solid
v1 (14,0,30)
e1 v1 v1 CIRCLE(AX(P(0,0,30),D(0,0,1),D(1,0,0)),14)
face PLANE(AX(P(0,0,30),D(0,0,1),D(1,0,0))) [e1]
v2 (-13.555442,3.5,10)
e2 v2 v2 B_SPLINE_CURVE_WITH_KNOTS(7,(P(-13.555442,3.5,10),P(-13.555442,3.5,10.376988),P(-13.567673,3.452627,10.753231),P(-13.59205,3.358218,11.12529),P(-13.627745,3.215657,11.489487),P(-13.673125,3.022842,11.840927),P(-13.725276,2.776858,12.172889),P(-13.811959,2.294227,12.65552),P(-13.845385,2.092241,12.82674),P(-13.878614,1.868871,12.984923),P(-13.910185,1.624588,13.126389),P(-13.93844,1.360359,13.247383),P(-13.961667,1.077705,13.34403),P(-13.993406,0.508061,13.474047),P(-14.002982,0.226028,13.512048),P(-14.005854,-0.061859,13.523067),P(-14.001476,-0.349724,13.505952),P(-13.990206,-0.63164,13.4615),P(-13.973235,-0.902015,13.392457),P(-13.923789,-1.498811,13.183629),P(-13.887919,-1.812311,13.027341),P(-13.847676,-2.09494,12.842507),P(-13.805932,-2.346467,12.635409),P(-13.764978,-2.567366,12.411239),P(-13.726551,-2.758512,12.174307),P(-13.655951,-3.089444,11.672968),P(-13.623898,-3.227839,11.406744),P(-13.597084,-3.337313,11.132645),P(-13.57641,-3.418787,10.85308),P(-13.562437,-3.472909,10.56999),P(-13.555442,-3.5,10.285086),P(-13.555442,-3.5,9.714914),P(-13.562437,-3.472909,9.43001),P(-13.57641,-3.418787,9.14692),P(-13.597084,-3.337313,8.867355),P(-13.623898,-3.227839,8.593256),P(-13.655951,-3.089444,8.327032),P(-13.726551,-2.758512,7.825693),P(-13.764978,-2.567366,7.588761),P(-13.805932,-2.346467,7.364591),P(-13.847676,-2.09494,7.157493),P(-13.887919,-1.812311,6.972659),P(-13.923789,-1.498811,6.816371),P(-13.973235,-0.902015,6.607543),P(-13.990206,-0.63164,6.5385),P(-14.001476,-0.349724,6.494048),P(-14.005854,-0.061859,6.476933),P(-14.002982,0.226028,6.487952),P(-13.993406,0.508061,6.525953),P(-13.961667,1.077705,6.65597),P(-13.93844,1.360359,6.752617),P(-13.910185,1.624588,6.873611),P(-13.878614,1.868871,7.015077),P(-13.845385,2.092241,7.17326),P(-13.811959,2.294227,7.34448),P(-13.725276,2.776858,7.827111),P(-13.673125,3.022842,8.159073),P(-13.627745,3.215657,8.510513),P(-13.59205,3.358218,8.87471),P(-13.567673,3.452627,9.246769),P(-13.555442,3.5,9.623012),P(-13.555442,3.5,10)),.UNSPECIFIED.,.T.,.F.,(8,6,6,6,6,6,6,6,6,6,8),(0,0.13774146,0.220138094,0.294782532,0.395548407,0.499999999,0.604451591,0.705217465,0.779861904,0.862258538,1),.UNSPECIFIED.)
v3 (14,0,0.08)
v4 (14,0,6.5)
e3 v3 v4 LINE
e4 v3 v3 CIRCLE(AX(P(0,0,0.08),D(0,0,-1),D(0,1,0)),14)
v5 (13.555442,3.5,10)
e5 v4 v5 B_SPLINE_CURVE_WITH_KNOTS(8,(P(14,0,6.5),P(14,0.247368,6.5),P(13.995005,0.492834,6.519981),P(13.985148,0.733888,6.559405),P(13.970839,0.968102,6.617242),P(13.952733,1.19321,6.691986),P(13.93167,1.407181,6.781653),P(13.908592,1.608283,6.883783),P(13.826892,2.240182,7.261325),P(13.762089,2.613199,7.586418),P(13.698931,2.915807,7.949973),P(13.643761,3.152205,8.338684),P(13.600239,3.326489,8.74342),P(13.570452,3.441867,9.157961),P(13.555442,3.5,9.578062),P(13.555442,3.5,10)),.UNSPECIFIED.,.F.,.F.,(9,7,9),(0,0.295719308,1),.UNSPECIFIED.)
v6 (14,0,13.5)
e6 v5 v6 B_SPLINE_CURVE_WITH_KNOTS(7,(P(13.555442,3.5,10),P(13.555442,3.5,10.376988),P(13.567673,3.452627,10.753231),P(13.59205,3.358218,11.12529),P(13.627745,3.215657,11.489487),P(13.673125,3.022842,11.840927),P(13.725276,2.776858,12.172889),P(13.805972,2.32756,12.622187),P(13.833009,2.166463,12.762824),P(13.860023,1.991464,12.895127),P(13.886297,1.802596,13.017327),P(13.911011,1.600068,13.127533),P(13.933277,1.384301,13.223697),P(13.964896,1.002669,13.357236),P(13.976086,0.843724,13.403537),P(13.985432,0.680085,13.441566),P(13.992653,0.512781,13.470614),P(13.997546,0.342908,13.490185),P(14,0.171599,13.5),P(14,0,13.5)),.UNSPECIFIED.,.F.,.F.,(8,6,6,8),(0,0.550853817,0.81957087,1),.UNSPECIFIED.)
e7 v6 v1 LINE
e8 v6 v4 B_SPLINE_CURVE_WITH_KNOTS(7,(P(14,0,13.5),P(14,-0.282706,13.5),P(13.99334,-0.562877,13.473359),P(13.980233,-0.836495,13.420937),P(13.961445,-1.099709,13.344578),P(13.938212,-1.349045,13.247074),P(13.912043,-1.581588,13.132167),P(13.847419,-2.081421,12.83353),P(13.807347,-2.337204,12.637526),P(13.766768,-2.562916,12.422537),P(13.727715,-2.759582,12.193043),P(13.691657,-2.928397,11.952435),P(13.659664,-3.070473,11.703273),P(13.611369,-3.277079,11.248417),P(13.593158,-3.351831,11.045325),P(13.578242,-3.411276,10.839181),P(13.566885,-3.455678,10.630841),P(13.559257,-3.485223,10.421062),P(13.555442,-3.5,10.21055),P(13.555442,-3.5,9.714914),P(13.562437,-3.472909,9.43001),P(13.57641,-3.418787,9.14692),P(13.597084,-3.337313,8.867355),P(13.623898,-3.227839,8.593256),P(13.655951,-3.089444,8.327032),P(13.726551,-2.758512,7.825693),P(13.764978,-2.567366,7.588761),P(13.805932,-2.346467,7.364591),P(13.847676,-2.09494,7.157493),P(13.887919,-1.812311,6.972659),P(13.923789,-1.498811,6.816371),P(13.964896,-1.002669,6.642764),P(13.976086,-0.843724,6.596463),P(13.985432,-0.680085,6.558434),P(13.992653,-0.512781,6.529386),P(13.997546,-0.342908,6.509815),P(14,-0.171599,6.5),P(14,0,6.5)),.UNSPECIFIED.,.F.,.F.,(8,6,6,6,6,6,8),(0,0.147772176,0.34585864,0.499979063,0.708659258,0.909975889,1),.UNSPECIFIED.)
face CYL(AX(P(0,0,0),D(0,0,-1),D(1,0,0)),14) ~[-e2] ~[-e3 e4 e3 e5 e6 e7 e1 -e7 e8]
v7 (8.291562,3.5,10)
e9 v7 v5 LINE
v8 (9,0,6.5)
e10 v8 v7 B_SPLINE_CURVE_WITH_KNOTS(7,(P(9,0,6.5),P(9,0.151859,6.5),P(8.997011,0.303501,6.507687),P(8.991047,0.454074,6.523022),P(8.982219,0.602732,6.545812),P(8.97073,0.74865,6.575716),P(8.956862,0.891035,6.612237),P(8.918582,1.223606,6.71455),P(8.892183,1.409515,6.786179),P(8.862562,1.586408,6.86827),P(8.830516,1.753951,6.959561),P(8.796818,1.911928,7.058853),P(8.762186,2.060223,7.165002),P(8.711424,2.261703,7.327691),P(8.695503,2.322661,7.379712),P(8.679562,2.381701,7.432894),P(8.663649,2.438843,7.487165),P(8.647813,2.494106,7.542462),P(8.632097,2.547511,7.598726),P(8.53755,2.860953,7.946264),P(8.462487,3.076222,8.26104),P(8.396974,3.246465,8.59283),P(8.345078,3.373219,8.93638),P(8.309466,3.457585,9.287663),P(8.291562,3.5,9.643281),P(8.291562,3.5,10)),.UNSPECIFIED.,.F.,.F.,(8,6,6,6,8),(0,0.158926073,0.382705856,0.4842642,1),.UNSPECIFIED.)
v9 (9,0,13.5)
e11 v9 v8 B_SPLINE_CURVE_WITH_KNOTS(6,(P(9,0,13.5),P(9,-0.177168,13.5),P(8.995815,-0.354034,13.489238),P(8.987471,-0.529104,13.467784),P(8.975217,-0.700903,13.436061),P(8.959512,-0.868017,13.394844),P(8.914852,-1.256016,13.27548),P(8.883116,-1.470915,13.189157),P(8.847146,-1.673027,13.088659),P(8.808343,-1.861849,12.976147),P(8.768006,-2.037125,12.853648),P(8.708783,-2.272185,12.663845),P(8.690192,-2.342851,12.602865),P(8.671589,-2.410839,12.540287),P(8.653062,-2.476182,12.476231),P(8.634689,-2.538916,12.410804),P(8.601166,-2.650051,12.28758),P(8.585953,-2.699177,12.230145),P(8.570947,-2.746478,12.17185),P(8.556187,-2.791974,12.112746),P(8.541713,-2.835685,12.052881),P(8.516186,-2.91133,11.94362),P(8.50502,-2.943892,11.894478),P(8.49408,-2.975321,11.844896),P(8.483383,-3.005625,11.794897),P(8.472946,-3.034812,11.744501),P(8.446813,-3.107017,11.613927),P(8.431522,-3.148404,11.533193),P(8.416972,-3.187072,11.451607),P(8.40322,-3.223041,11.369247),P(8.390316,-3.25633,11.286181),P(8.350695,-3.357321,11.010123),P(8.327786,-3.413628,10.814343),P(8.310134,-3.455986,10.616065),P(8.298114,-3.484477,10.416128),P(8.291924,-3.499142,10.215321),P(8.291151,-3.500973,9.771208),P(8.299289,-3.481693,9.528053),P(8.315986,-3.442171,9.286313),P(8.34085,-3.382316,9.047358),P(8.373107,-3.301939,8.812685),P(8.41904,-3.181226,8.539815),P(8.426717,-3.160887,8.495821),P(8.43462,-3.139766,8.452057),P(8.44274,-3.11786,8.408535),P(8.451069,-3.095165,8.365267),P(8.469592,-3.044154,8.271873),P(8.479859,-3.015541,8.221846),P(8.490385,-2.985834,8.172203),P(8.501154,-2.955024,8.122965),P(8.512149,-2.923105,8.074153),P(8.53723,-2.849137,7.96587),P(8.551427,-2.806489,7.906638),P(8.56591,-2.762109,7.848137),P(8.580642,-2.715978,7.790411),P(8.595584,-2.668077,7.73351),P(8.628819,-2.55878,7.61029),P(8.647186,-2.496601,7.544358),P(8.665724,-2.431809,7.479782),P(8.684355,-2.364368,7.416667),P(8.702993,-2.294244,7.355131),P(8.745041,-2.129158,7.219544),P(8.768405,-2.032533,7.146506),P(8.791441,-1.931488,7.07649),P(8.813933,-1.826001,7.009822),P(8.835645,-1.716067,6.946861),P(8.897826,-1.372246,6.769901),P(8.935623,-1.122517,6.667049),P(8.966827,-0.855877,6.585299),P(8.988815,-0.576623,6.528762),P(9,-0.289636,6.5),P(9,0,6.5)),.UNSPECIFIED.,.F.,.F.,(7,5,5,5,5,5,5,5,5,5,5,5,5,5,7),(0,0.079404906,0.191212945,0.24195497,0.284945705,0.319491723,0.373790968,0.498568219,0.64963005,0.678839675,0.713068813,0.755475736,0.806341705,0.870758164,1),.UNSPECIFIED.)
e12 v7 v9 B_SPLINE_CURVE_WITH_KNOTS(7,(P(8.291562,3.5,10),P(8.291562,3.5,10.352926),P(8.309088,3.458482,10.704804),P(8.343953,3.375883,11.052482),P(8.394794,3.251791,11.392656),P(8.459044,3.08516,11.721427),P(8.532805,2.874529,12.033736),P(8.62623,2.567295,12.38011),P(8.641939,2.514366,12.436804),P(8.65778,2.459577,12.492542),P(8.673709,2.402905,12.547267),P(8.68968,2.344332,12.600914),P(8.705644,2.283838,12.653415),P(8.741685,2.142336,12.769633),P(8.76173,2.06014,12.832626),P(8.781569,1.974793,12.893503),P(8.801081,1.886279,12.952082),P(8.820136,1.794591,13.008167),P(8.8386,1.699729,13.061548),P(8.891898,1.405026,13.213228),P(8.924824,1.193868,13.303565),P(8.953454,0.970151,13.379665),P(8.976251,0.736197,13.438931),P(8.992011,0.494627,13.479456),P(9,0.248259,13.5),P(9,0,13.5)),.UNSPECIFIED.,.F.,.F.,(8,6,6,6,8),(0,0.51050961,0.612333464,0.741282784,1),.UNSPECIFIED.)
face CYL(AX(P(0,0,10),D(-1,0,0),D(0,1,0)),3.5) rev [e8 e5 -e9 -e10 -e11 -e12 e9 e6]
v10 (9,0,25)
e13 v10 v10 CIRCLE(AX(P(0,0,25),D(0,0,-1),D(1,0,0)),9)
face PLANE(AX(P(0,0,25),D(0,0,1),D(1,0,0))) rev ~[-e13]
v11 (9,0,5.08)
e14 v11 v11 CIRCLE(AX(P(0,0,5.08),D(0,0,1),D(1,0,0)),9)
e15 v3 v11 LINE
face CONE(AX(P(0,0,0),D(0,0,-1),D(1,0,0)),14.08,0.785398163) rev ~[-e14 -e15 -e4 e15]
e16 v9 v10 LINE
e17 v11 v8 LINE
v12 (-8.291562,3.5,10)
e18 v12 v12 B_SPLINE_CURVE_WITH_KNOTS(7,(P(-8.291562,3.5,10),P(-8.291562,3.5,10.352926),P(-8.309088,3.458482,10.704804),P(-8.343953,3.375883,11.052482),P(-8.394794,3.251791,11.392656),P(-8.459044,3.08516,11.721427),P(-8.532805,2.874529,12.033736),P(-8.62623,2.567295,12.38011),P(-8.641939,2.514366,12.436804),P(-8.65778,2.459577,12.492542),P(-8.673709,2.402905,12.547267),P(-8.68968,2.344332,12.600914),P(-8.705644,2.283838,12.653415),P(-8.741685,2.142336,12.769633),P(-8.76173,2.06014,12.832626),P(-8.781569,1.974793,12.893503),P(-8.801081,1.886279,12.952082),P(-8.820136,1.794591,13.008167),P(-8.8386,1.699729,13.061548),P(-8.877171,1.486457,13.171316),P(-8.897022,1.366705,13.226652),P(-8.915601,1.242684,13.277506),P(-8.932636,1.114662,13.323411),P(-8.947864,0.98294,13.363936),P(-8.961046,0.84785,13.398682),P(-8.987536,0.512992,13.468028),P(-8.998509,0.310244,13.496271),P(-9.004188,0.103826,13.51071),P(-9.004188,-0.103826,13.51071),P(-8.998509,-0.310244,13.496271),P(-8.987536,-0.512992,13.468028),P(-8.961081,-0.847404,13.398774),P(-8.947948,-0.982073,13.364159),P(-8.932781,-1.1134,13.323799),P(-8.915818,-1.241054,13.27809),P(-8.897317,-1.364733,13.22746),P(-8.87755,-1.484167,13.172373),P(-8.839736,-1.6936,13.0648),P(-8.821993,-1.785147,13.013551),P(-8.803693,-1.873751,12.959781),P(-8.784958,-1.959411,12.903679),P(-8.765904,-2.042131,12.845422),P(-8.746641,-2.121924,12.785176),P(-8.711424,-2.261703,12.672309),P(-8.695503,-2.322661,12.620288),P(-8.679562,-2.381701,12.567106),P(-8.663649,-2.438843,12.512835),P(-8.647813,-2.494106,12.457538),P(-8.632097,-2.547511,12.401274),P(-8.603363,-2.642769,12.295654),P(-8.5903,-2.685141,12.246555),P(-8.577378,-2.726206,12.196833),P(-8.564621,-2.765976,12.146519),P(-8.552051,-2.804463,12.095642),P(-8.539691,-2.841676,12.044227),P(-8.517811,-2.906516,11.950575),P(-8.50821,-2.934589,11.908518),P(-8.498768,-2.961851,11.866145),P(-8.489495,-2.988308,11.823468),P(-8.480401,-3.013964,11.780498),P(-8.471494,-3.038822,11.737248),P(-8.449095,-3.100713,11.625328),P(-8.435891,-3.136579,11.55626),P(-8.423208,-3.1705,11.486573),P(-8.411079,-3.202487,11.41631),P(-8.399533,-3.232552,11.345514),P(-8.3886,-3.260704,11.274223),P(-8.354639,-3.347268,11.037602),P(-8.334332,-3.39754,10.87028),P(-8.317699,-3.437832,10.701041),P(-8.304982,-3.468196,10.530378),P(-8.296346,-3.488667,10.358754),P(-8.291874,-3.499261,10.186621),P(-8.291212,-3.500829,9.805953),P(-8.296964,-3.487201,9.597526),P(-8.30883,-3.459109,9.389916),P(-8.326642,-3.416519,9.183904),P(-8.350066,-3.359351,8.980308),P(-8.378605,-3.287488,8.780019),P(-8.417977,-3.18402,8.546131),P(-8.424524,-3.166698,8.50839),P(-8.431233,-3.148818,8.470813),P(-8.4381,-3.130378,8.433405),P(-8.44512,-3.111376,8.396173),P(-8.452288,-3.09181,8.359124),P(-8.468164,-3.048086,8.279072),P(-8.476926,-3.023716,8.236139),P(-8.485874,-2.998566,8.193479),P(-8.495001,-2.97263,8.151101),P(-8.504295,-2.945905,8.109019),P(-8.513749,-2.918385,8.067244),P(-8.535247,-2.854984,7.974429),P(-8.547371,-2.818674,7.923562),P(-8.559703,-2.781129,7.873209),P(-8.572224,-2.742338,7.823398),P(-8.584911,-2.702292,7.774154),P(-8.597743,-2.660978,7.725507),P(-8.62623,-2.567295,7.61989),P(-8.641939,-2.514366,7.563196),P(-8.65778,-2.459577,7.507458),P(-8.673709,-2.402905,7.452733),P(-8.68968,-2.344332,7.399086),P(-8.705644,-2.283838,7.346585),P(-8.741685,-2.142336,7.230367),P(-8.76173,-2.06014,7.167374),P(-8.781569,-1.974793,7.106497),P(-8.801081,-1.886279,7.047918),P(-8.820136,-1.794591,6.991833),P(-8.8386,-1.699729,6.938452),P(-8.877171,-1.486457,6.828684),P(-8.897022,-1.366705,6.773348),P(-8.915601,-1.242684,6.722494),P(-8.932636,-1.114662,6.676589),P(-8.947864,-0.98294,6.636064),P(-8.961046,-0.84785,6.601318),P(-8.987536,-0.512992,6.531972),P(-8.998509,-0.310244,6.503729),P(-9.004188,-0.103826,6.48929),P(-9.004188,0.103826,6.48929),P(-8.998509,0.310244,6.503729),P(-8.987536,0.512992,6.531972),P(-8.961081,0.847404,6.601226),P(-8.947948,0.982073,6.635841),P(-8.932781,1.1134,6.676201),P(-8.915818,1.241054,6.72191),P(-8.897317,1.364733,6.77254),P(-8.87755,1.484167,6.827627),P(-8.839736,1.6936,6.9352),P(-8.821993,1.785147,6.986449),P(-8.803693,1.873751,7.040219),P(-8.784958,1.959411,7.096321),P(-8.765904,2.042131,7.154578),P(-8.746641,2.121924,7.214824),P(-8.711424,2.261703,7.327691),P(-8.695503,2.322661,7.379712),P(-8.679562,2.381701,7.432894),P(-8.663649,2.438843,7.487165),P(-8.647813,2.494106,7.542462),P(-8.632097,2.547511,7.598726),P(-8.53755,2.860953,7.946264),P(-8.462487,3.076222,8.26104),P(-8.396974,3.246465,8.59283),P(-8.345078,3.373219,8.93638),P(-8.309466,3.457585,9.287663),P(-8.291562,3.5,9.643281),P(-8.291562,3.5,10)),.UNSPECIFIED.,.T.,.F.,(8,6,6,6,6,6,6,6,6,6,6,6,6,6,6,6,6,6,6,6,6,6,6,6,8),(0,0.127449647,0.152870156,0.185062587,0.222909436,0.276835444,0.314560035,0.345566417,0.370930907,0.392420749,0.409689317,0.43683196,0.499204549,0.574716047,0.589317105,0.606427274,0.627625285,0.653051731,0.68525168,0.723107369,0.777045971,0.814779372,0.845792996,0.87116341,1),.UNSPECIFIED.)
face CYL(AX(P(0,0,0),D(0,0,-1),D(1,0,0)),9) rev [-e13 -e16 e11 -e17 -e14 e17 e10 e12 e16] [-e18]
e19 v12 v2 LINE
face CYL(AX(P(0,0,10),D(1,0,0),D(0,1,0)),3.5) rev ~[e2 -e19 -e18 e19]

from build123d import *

# Parameters (mm, degrees)
F0_R          = 14
F1_DEPTH      = 30
F2_T          = -5
F3_R          = 3.5
F4_DEPTH      = 14.001
F4_DEPTH_BACK = 14.001


# Not quite as in the source:
# - a fillet or chamfer that OpenCascade refuses, or shapes differently, is made with other operations: its cross-section is extruded or revolved along the edge and cut away or added


with BuildPart() as f1:
    # F0 (on Top) → F1 (new body)
    with BuildSketch(Plane.XY):
        Circle(F0_R)
    extrude(amount=F1_DEPTH)

    # F2
    f2_openings = [f1.faces().sort_by_distance(p)[0] for p in [
        (0, 0, 0),
    ]]
    offset(amount=F2_T, openings=f2_openings)

    # F3 (on Right) → F4 (cut, two sides)
    with BuildSketch(Plane.YZ) as f4_sk:
        with Locations((0, 10)):
            Circle(F3_R)
    extrude(amount=-F4_DEPTH, mode=Mode.SUBTRACT)
    extrude(f4_sk.sketch, amount=F4_DEPTH_BACK, mode=Mode.SUBTRACT)

    # F5: chamfer of 5.08 on 1 edges, made by hand

    # F5_s1 → F5_t2 (revolve, cut)
    with BuildSketch(Plane.XZ):
        Polygon((14.08, 0), (9, 5.08), (9, 0), align=None)
    revolve(axis=Axis((0, 0, 0), (0, 0, 1)), mode=Mode.SUBTRACT)


solid = f1.part
